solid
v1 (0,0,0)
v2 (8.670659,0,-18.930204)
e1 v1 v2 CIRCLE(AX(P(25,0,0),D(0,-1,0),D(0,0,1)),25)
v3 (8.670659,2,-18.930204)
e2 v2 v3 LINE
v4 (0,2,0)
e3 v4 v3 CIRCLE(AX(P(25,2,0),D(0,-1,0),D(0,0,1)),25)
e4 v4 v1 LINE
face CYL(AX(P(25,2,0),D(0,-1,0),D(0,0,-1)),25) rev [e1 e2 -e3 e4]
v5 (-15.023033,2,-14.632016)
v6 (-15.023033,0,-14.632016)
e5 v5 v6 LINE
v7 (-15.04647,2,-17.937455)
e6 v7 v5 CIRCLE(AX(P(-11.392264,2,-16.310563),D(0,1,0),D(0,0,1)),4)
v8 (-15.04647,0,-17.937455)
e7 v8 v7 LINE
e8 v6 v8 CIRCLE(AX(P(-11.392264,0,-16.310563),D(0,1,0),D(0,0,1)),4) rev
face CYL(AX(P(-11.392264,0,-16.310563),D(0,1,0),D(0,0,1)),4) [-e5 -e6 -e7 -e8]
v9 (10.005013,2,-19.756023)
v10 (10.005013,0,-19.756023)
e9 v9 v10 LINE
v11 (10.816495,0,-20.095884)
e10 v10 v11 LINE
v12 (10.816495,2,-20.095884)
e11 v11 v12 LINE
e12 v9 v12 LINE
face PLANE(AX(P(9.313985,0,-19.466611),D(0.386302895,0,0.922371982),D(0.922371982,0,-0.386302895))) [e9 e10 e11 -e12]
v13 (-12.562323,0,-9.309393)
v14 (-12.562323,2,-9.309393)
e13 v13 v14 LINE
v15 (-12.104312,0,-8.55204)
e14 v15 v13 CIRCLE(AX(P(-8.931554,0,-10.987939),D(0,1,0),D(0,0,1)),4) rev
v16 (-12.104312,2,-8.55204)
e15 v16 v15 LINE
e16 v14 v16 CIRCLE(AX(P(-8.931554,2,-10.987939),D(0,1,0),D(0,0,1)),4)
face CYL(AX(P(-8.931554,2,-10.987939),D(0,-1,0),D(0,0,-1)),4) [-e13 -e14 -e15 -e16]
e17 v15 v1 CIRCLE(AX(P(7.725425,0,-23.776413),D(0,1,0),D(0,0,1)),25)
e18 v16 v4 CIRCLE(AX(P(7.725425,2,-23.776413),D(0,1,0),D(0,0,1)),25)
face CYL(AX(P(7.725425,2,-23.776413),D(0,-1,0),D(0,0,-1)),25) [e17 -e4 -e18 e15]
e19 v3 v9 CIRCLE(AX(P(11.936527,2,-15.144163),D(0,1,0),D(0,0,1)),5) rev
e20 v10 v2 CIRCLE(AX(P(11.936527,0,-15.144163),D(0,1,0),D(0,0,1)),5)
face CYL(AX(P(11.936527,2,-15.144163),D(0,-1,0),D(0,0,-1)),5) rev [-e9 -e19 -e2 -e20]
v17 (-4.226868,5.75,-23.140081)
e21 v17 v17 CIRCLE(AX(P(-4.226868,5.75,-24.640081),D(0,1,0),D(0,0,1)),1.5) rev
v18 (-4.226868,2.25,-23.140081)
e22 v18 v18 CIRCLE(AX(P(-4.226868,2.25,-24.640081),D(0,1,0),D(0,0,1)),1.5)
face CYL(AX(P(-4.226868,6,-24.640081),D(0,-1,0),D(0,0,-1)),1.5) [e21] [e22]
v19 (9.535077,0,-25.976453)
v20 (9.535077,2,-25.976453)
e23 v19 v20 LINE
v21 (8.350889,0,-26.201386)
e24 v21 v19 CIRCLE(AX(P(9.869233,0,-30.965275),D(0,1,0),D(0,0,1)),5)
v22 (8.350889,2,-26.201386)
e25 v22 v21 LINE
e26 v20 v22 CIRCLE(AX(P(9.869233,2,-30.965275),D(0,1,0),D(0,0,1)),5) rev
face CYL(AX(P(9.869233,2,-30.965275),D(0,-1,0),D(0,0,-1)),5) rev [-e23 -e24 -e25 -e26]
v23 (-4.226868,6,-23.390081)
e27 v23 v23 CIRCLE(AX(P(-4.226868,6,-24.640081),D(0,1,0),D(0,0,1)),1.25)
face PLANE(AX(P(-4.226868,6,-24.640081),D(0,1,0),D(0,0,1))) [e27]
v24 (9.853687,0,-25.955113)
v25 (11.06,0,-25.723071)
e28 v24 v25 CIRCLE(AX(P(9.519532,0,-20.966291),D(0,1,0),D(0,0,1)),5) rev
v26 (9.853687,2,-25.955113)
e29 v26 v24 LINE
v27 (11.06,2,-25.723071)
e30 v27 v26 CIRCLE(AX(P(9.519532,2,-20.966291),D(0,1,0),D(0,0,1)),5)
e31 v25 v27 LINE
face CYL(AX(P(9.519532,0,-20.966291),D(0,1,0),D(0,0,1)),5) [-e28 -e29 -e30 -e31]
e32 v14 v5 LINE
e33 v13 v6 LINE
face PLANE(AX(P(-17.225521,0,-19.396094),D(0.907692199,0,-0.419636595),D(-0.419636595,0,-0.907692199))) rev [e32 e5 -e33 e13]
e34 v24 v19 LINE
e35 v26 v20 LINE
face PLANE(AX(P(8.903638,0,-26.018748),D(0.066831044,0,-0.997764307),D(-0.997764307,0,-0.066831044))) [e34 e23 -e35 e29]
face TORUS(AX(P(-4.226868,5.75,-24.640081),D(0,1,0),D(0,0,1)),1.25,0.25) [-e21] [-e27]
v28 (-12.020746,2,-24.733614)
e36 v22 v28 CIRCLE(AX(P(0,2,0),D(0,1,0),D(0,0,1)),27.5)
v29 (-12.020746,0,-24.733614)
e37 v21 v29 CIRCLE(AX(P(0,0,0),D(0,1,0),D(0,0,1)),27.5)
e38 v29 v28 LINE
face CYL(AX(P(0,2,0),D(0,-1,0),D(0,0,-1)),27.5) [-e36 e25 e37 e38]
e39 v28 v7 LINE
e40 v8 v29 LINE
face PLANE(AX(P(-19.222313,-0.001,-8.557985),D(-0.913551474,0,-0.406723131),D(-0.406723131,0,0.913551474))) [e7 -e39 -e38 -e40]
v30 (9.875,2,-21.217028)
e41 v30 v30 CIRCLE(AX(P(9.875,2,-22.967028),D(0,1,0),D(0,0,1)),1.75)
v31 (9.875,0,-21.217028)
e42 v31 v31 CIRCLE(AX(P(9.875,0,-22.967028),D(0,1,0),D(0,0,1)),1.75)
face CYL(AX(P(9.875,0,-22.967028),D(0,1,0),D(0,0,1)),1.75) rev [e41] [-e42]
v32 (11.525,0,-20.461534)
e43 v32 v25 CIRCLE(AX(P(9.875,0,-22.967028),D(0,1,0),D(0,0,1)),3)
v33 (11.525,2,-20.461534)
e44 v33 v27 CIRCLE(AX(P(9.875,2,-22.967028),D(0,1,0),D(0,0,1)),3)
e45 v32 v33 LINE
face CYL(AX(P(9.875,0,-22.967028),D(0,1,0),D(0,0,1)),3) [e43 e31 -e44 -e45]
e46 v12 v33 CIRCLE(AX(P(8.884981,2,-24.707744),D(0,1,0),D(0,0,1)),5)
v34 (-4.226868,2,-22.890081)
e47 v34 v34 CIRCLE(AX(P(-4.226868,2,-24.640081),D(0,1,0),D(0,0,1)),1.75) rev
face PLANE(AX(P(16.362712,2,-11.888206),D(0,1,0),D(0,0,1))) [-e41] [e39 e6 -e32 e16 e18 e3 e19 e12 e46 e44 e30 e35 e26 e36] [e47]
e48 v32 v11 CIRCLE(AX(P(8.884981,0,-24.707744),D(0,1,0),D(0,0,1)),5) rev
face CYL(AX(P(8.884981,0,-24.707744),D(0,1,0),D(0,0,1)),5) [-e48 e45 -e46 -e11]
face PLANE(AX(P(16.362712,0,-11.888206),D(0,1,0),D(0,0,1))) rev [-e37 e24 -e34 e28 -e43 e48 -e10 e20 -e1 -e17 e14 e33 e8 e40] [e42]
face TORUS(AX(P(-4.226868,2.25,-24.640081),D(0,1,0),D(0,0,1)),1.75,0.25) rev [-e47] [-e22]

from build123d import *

# Parameters (mm, degrees)
BOSS_EXTRUDE1_DEPTH = 2
FILLET1_R           = 2.5
SKETCH2_R           = 1.5
SKETCH2_R_2         = 1.75
CUT_EXTRUDE1_DEPTH  = 2
CUT_EXTRUDE2_REACH  = 34.399
BOSS_EXTRUDE2_START = -2
SKETCH6_R           = 1.5
BOSS_EXTRUDE2_DEPTH = 2
BOSS_EXTRUDE3_START = -2
BOSS_EXTRUDE3_DEPTH = 2
FILLET2_START       = -1
FILLET2_DEPTH       = 4
FILLET2_2_DEPTH     = 2
CUT_EXTRUDE3_DEPTH  = 2
FILLET3_R           = 4
SKETCH11_R          = 1.5
BOSS_EXTRUDE4_DEPTH = 4
FILLET6_R           = 0.25


with BuildPart() as part:
    # Sketch1 → Boss-Extrude1 (new body)
    with BuildSketch(Plane(origin=(0, 0, 0), x_dir=(1, 0, 0), z_dir=(0, 1, 0))):
        with BuildLine():
            ThreePointArc((15.125, 22.967027997), (-1.263298306, 27.470967901), (-17.169059596, 21.48193177))
            ThreePointArc((-17.169059596, 21.48193177), (-11.803604023, 8.168176911), (0, 0))
            ThreePointArc((0, 0), (4.120883639, 13.75), (15.125, 22.967027997))
        make_face()
    extrude(amount=BOSS_EXTRUDE1_DEPTH)

    # Fillet1
    fillet1_edges = [part.edges().sort_by_distance(p)[0] for p in [
        (-17.169059596, 1, -21.48193177),
        (15.125, 1, -22.967027997),
    ]]
    fillet(fillet1_edges, radius=FILLET1_R)

    # Sketch2 → Cut-Extrude1 (cut)
    with BuildSketch(Plane(origin=(0, 2, 0), x_dir=(1, 0, 0), z_dir=(0, 1, 0))):
        with Locations(Location((-4.226868107, 24.640080885, 0), (0, 0, 270))):
            Circle(SKETCH2_R)
        with Locations(Location((9.875, 22.967027997, 0), (0, 0, 270))):
            Circle(SKETCH2_R_2)
    extrude(amount=-CUT_EXTRUDE1_DEPTH, mode=Mode.SUBTRACT)

    # Sketch3 → Cut-Extrude2 (cut, up to next)
    with BuildSketch(Plane(origin=(0, 2, 0), x_dir=(1, 0, 0), z_dir=(0, 1, 0)), mode=Mode.PRIVATE) as cut_extrude2_sk1:
        with BuildLine():
            Line((-15.980917027, 15.838569726), (-12.020745702, 24.733614228))
            ThreePointArc((-12.020745702, 24.733614228), (-14.04148027, 23.645017061), (-15.964394934, 22.391696997))
            ThreePointArc((-15.964394934, 22.391696997), (-16.816313344, 21.328273965), (-16.984031989, 19.976052098))
            ThreePointArc((-16.984031989, 19.976052098), (-16.570708205, 17.885919028), (-15.980917027, 15.838569726))
        make_face()
    cut_extrude2_tool1 = extrude(cut_extrude2_sk1.sketch, amount=-CUT_EXTRUDE2_REACH, mode=Mode.PRIVATE) & part.part
    add(cut_extrude2_tool1.solids().sort_by_distance((-15.061244, 2, -20.693622))[0], mode=Mode.SUBTRACT)

    # Sketch6 → Boss-Extrude2 (add)
    with BuildSketch(Plane.XZ.offset(BOSS_EXTRUDE2_START)):
        with Locations((-4.226868107, -24.640080885)):
            Circle(SKETCH6_R)
    extrude(amount=BOSS_EXTRUDE2_DEPTH)

    # Sketch7 → Boss-Extrude3 (add)
    with BuildSketch(Plane(origin=(0, 2, 0), x_dir=(1, 0, 0), z_dir=(0, 1, 0)).offset(BOSS_EXTRUDE3_START)):
        with BuildLine():
            Line((9.313984882, 19.466610638), (11.248778971, 20.27693074))
            ThreePointArc((11.248778971, 20.27693074), (11.386576571, 20.3697006), (11.525, 20.461534033))
            ThreePointArc((11.525, 20.461534033), (12.863352389, 23.23113025), (11.06, 25.723071356))
            ThreePointArc((11.06, 25.723071356), (10.846265511, 25.813921137), (10.631784841, 25.902995022))
            Line((10.631784841, 25.902995022), (8.903638019, 26.018747665))
            ThreePointArc((8.903638019, 26.018747665), (9.890276319, 25.659938315), (10.8625, 25.263730796))
            ThreePointArc((10.8625, 25.263730796), (12.365293657, 23.187113207), (11.25, 20.879116361))
            ThreePointArc((11.25, 20.879116361), (10.26505719, 20.196075371), (9.313984882, 19.466610638))
        make_face()
    extrude(amount=BOSS_EXTRUDE3_DEPTH)

    # Fillet2: read off the stored shape, not the designer's step
    # Fillet2 outline → Fillet2 (cut)
    with BuildSketch(Plane(origin=(0, 0, 0), x_dir=(1, 0, 0), z_dir=(0, 1, 0)).offset(FILLET2_START)):
        with BuildLine():
            ThreePointArc((11.525, 20.461534033), (11.178047435, 20.264564275), (10.816495082, 20.095883915))
            Line((10.816495082, 20.095883915), (11.248778971, 20.27693074))
            ThreePointArc((11.248778971, 20.27693074), (11.386576571, 20.3697006), (11.525, 20.461534033))
        make_face()
        with BuildLine():
            Line((10.631784841, 25.902995022), (9.853687309, 25.955112611))
            ThreePointArc((9.853687309, 25.955112611), (10.463996888, 25.876279494), (11.06, 25.723071356))
            ThreePointArc((11.06, 25.723071356), (10.846265511, 25.813921137), (10.631784841, 25.902995022))
        make_face()
    extrude(amount=FILLET2_DEPTH, mode=Mode.SUBTRACT)

    # Fillet2 2 outline → Fillet2 2 (add)
    with BuildSketch(Plane(origin=(0, 0, 0), x_dir=(1, 0, 0), z_dir=(0, 1, 0))):
        with BuildLine():
            ThreePointArc((9.313984882, 19.466610638), (8.990075455, 19.201101949), (8.670659365, 18.930204289))
            ThreePointArc((8.670659365, 18.930204289), (9.30523679, 19.395787738), (10.005013016, 19.756023341))
            Line((10.005013016, 19.756023341), (9.313984882, 19.466610638))
        make_face()
        with BuildLine():
            Line((8.903638019, 26.018747665), (9.535077314, 25.97645336))
            ThreePointArc((9.535077314, 25.97645336), (8.936180246, 26.053104962), (8.350889065, 26.201386448))
            ThreePointArc((8.350889065, 26.201386448), (8.627746835, 26.111529725), (8.903638019, 26.018747665))
        make_face()
    extrude(amount=FILLET2_2_DEPTH)

    # Sketch8 → Cut-Extrude3 (cut)
    with BuildSketch(Plane(origin=(0, 2, 0), x_dir=(1, 0, 0), z_dir=(0, 1, 0))):
        Polygon((-17.225521171, 19.396093794), (-10.650323335, 5.173654997), (-21.381773126, 15.240189751), align=None)
    extrude(amount=-CUT_EXTRUDE3_DEPTH, mode=Mode.SUBTRACT)

    # Fillet3
    fillet3_edges = [part.edges().sort_by_distance(p)[0] for p in [
        (-15.784646242, 1, -16.279418676),
        (-12.383702581, 1, -8.923029671),
    ]]
    fillet(fillet3_edges, radius=FILLET3_R)

    # Sketch11 → Boss-Extrude4 (add)
    with BuildSketch(Plane(origin=(0, 2, 0), x_dir=(1, 0, 0), z_dir=(0, 1, 0))):
        with Locations(Location((-4.226868107, 24.640080885, 0), (0, 0, 270))):
            Circle(SKETCH11_R)
    extrude(amount=BOSS_EXTRUDE4_DEPTH)

    # Fillet6
    fillet6_edges = [part.edges().sort_by_distance(p)[0] for p in [
        (-4.226868107, 2, -26.140080885),
        (-4.226868107, 6, -26.140080885),
    ]]
    fillet(fillet6_edges, radius=FILLET6_R)


solid = part.part
